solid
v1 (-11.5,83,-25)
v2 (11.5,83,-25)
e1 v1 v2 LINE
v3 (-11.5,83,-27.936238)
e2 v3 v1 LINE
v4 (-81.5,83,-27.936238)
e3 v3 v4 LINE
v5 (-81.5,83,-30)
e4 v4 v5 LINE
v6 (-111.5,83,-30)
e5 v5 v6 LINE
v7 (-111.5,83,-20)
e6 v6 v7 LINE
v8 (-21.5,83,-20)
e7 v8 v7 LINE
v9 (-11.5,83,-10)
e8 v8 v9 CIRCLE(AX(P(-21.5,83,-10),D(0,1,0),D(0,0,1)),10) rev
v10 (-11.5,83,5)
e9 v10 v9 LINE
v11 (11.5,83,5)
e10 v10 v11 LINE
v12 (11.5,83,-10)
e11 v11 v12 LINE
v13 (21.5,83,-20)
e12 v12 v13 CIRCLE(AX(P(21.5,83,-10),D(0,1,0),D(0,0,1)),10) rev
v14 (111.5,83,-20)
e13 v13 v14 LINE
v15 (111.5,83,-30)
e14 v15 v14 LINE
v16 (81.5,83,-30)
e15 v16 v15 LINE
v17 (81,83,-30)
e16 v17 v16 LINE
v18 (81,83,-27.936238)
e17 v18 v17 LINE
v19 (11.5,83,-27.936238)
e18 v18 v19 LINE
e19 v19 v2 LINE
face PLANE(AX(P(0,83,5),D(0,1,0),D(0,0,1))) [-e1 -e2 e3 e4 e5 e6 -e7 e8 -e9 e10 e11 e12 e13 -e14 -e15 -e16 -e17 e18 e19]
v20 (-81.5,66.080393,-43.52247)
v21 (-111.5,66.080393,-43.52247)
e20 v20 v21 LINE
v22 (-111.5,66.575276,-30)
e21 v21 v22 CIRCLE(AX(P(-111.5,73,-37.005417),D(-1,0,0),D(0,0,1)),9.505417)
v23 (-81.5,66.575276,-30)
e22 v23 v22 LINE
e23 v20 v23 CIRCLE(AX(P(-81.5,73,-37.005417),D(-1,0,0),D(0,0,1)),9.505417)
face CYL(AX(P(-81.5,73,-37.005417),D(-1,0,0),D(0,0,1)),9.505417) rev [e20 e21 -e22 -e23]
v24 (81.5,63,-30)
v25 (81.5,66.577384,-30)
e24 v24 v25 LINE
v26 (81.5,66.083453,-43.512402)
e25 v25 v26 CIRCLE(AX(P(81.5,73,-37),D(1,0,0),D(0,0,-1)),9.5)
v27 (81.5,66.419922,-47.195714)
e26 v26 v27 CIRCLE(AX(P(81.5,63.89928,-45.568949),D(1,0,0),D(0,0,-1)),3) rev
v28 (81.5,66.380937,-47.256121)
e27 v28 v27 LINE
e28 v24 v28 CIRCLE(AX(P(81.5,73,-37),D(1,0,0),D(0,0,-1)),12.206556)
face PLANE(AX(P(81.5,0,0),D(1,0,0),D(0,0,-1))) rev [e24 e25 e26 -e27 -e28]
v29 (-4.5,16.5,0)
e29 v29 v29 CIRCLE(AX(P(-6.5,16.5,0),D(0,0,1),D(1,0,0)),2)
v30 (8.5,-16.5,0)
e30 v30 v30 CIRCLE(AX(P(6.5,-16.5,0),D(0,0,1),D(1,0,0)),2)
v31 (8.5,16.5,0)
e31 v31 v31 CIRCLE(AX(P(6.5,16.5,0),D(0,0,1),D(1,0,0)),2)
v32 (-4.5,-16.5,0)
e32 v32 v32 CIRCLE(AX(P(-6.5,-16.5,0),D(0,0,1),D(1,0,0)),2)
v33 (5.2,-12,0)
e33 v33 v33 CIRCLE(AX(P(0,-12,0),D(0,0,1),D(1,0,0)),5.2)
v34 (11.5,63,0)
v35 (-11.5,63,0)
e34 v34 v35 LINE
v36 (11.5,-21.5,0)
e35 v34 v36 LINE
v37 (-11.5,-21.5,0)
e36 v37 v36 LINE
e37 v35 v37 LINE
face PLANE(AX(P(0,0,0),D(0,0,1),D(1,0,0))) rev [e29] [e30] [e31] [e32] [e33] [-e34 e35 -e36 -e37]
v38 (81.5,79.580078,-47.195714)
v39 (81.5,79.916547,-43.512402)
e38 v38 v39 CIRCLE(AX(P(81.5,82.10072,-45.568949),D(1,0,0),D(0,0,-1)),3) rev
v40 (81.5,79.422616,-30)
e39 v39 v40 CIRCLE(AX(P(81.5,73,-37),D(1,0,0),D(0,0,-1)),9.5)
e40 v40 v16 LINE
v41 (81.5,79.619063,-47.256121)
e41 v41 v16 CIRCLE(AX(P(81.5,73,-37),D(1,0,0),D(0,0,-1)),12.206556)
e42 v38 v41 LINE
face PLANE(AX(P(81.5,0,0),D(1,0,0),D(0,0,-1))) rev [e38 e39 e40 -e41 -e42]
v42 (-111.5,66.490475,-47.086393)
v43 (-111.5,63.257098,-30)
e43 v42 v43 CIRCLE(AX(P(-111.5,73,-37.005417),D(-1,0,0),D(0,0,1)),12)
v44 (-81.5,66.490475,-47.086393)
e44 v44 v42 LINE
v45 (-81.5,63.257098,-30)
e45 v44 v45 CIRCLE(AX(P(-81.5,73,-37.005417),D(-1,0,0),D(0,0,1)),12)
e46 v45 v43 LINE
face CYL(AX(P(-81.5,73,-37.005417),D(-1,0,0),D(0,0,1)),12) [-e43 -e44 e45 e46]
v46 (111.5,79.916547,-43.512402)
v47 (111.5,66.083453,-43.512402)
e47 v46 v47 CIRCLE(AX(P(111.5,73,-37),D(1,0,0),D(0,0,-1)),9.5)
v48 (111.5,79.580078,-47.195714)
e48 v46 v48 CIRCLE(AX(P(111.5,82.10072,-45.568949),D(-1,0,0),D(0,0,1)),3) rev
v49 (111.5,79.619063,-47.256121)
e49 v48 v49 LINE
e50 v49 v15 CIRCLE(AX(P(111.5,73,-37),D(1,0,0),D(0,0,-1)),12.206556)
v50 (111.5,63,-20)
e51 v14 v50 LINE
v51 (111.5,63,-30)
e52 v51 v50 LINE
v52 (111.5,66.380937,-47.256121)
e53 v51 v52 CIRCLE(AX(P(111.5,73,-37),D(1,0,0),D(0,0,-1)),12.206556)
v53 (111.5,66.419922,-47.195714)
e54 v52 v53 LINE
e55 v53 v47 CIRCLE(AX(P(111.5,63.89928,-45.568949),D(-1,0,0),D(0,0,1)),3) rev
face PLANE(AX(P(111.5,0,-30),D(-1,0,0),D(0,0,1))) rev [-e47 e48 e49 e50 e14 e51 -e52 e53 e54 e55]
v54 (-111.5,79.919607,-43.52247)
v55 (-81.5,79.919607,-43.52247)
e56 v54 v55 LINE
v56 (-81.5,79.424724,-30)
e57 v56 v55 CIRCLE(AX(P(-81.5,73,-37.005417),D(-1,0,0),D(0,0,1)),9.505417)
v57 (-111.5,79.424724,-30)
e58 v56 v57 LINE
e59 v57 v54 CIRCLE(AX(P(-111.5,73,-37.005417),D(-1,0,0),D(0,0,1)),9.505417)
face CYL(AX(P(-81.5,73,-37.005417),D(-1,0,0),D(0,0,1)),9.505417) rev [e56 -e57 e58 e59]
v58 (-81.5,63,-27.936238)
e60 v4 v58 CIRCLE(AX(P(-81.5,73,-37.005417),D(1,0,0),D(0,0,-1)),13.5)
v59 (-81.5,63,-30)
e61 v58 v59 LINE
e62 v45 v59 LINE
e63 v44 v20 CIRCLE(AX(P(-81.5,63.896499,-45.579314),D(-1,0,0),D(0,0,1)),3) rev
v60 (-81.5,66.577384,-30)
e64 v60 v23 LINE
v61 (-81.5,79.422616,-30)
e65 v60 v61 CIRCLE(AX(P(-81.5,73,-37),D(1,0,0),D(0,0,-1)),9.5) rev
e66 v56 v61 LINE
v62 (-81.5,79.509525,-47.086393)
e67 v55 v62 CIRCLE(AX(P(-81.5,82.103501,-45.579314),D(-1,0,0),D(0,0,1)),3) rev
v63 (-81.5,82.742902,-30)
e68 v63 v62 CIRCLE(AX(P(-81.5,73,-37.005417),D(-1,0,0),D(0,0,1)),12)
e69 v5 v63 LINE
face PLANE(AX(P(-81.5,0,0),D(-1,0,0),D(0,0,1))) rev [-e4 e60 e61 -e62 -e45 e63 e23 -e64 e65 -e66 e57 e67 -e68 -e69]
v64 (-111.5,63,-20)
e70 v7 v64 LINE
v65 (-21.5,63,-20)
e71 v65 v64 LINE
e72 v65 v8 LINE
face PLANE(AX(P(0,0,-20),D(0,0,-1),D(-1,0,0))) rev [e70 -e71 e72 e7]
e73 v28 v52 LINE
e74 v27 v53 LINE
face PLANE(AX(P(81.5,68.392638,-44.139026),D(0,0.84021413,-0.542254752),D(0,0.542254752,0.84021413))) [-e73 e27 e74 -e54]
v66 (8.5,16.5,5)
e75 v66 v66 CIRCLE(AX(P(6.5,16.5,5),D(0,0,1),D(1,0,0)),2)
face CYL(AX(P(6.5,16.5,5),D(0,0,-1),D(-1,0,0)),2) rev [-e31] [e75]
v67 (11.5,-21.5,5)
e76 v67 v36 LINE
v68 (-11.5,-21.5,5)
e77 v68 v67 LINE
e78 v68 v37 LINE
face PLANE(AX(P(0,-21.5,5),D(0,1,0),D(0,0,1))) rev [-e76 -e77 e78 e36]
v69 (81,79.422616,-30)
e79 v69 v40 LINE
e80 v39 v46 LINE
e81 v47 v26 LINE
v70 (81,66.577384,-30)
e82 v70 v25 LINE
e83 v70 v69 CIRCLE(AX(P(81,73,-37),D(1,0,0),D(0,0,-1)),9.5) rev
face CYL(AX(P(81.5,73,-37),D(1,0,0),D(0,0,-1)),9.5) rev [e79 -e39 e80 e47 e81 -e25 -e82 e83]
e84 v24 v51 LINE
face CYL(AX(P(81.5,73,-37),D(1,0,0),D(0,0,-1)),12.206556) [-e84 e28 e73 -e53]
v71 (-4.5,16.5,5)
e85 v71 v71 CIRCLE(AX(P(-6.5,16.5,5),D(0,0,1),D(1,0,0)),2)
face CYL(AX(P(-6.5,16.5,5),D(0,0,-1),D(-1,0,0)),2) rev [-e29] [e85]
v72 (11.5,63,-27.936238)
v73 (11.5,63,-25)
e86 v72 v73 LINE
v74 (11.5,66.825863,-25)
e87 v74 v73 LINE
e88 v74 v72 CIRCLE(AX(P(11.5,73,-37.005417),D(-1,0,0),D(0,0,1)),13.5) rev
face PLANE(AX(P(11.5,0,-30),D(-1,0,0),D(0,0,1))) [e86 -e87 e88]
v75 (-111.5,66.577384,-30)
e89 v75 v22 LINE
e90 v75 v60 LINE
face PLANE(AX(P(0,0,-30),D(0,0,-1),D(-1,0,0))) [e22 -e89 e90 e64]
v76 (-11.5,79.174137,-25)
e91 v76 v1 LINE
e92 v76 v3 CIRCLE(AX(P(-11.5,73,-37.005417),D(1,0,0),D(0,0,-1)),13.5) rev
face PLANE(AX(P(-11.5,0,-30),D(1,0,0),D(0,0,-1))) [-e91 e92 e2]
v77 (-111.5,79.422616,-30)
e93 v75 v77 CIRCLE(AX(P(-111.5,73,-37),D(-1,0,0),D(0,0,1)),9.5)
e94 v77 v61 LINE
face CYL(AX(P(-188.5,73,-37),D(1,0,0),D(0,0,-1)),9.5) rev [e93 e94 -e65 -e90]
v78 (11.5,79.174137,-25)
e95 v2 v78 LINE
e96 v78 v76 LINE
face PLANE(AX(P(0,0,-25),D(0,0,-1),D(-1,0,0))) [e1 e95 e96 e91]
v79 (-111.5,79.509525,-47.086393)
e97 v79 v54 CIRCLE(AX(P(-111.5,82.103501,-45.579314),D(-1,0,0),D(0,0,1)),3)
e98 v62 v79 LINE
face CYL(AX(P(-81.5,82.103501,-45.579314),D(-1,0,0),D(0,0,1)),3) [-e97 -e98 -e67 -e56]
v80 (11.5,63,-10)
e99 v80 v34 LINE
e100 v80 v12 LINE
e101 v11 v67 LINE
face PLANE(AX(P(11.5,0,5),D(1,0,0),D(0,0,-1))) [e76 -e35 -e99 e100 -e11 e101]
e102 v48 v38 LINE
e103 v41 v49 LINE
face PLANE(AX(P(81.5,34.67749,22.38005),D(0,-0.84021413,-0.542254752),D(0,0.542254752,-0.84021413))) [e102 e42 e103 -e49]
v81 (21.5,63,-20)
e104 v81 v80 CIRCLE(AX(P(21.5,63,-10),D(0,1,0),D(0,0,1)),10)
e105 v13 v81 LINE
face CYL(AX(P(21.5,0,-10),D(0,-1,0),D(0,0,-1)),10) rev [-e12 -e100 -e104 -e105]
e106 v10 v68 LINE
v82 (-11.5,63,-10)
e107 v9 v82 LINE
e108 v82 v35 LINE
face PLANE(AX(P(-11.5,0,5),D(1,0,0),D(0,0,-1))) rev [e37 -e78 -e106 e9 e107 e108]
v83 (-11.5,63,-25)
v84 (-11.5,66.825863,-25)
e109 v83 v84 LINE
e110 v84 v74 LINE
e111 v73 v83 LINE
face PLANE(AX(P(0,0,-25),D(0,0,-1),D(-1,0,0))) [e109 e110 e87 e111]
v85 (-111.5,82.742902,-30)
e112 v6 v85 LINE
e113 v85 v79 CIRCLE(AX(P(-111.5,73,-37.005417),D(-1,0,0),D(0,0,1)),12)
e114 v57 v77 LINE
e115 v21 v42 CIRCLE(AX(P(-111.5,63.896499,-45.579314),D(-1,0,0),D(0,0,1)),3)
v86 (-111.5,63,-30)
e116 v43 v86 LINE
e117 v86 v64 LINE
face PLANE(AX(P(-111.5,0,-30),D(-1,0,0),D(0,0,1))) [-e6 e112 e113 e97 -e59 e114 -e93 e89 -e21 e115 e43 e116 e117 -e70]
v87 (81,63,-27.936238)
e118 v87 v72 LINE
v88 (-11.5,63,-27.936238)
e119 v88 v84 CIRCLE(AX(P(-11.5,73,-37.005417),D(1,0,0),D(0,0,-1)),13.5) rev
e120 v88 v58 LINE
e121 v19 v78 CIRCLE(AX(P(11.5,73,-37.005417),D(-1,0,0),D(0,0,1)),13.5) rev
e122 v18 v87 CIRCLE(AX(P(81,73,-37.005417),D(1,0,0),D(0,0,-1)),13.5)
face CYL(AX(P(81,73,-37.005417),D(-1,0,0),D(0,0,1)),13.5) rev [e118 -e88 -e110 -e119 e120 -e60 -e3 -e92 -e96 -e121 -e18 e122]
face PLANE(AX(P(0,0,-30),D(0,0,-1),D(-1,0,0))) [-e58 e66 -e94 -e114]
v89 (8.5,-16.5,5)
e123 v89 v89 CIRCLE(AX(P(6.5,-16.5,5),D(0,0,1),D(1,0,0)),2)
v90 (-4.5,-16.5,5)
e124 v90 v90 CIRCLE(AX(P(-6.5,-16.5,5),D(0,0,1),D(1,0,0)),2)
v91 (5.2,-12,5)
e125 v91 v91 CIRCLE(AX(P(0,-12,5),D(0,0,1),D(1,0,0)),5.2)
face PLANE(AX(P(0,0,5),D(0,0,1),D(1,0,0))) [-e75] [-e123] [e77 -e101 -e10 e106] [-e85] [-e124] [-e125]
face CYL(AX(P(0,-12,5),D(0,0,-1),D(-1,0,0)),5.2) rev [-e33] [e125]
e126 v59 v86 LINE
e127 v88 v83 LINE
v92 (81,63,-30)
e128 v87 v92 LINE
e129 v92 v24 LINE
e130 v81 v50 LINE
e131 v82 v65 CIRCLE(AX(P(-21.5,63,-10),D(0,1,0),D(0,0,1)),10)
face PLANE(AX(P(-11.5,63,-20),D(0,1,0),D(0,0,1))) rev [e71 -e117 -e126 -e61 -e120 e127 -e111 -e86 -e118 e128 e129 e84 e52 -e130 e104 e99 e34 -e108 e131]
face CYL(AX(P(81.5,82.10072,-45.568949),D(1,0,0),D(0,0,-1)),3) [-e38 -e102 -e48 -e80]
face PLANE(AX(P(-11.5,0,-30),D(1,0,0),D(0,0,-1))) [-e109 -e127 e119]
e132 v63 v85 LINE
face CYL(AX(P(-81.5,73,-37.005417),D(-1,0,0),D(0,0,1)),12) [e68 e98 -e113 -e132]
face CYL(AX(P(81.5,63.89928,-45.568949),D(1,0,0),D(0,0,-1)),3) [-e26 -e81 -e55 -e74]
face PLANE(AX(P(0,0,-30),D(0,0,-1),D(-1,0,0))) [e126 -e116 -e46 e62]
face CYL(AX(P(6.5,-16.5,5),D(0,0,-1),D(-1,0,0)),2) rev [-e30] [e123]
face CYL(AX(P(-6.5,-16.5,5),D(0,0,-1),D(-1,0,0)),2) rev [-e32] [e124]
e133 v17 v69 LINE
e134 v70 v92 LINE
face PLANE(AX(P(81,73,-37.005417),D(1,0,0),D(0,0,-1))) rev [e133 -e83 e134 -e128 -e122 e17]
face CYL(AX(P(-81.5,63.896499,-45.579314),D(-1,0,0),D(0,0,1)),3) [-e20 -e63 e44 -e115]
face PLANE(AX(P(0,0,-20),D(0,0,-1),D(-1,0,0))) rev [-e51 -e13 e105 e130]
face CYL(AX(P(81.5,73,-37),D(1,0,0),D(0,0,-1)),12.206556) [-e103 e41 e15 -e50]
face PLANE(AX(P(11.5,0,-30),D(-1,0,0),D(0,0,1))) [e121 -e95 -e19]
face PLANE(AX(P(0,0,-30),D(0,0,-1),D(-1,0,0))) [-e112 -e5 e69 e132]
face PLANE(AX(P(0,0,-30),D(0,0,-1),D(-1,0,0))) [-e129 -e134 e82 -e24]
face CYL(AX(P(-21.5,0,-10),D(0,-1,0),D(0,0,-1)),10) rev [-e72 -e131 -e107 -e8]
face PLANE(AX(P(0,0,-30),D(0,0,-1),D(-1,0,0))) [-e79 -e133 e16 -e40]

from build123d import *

# Parameters (mm, degrees)
SKETCH1_W           = 23
SKETCH1_H           = 104.5
SKETCH1_R           = 2
SKETCH1_R_2         = 5.2
BOSS_EXTRUDE1_DEPTH = 5
SKETCH2_W           = 23
SKETCH2_H           = 20
BOSS_EXTRUDE2_DEPTH = 20
SKETCH3_W           = 23
SKETCH3_H           = 20
BOSS_EXTRUDE3_DEPTH = 5
SKETCH3_3_W         = 100
SKETCH3_3_H         = 20
BOSS_EXTRUDE4_DEPTH = 10
BOSS_EXTRUDE5_DEPTH = 30
BOSS_EXTRUDE6_DEPTH = 30
FILLET1_R           = 10
CUT_EXTRUDE1_DEPTH  = 300
SKETCH6_R           = 13.5
CUT_EXTRUDE2_DEPTH  = 162.5
FILLET5_R           = 3


with BuildPart() as part:
    # Sketch1 → Boss-Extrude1 (new body)
    with BuildSketch(Plane.XY):
        with Locations((0, 30.75)):
            Rectangle(SKETCH1_W, SKETCH1_H)
        with Locations((6.5, 16.5)):
            Circle(SKETCH1_R, mode=Mode.SUBTRACT)
        with Locations((6.5, -16.5)):
            Circle(SKETCH1_R, mode=Mode.SUBTRACT)
        with Locations((0, -12)):
            Circle(SKETCH1_R_2, mode=Mode.SUBTRACT)
        with Locations((-6.5, -16.5)):
            Circle(SKETCH1_R, mode=Mode.SUBTRACT)
        with Locations((-6.5, 16.5)):
            Circle(SKETCH1_R, mode=Mode.SUBTRACT)
    extrude(amount=BOSS_EXTRUDE1_DEPTH)

    # Sketch2 → Boss-Extrude2 (add)
    with BuildSketch(Plane(origin=(0, 0, 0), x_dir=(-1, 0, 0), z_dir=(0, 0, -1))):
        with Locations((0, 73)):
            Rectangle(SKETCH2_W, SKETCH2_H)
    extrude(amount=BOSS_EXTRUDE2_DEPTH)

    # Sketch3 → Boss-Extrude3 (add)
    with BuildSketch(Plane(origin=(0, 0, -20), x_dir=(-1, 0, 0), z_dir=(0, 0, -1))):
        with Locations((0, 73)):
            Rectangle(SKETCH3_W, SKETCH3_H)
    extrude(amount=BOSS_EXTRUDE3_DEPTH)

    # Sketch3<3> → Boss-Extrude4 (add)
    with BuildSketch(Plane(origin=(0, 0, -20), x_dir=(-1, 0, 0), z_dir=(0, 0, -1))):
        with Locations((-61.5, 73)):
            Rectangle(SKETCH3_3_W, SKETCH3_3_H)
        with Locations((61.5, 73)):
            Rectangle(SKETCH3_3_W, SKETCH3_3_H)
    extrude(amount=BOSS_EXTRUDE4_DEPTH)

    # Sketch4 → Boss-Extrude5 (add)
    with BuildSketch(Plane(origin=(111.5, 0, 0), x_dir=(0, 0, -1), z_dir=(1, 0, 0))):
        with BuildLine():
            Line((30, 83), (30, 79.422616289))
            ThreePointArc((30, 79.422616289), (37.803170415, 82.465987391), (44.982034231, 78.151420148))
            Line((44.982034231, 78.151420148), (47.256120501, 79.619062793))
            ThreePointArc((47.256120501, 79.619062793), (39.346969169, 84.978803601), (30, 83))
        make_face()
        with BuildLine():
            ThreePointArc((44.982034231, 67.848579852), (37.803170415, 63.534012609), (30, 66.577383711))
            Line((30, 66.577383711), (30, 63))
            ThreePointArc((30, 63), (39.346969169, 61.021196399), (47.256120501, 66.380937207))
            Line((47.256120501, 66.380937207), (44.982034231, 67.848579852))
        make_face()
    extrude(amount=-BOSS_EXTRUDE5_DEPTH)

    # Sketch5 → Boss-Extrude6 (add)
    with BuildSketch(Plane.ZY.offset(111.5)):
        with BuildLine():
            ThreePointArc((-44.99074033, 78.15631214), (-37.806835348, 82.471571982), (-30, 79.42472441))
            Line((-30, 79.42472441), (-30, 82.742901835))
            ThreePointArc((-30, 82.742901835), (-39.236660525, 84.790740062), (-47.086393259, 79.50952476))
            Line((-47.086393259, 79.50952476), (-44.99074033, 78.15631214))
        make_face()
        with BuildLine():
            Line((-30, 63.257098165), (-30, 66.57527559))
            ThreePointArc((-30, 66.57527559), (-37.806835348, 63.528428018), (-44.99074033, 67.84368786))
            Line((-44.99074033, 67.84368786), (-47.086393259, 66.49047524))
            ThreePointArc((-47.086393259, 66.49047524), (-39.236660525, 61.209259938), (-30, 63.257098165))
        make_face()
    extrude(amount=-BOSS_EXTRUDE6_DEPTH)

    # Fillet1
    fillet1_edges = [part.edges().sort_by_distance(p)[0] for p in [
        (11.5, 73, -20),
        (-11.5, 73, -20),
    ]]
    fillet(fillet1_edges, radius=FILLET1_R)

    # Sketch4<3> → Cut-Extrude1 (cut)
    with BuildSketch(Plane(origin=(111.5, 0, 0), x_dir=(0, 0, -1), z_dir=(1, 0, 0))):
        with BuildLine():
            Line((30, 66.577383711), (30, 73))
            Line((30, 73), (27.5, 73))
            ThreePointArc((27.5, 73), (28.147034395, 69.553987812), (30, 66.577383711))
        make_face()
        with BuildLine():
            Line((27.5, 73), (30, 73))
            Line((30, 73), (30, 79.422616289))
            ThreePointArc((30, 79.422616289), (28.147034395, 76.446012188), (27.5, 73))
        make_face()
    extrude(amount=-CUT_EXTRUDE1_DEPTH, mode=Mode.SUBTRACT)

    # Sketch6 → Cut-Extrude2 (cut)
    with BuildSketch(Plane(origin=(-81.5, 0, 0), x_dir=(0, 0, -1), z_dir=(1, 0, 0))):
        with Locations((37.005416749, 73)):
            Circle(SKETCH6_R)
    extrude(amount=CUT_EXTRUDE2_DEPTH, mode=Mode.SUBTRACT)

    # Fillet5
    # the kernel refuses this fillet: 3 mm, written as the material it takes off along each edge
    with BuildSketch(Plane(origin=(118.086652749, 67.848579852, -44.982034231), x_dir=(0, -0.768500975054365, 0.6398486159557513), z_dir=(-1, 0, 0))) as fillet5_piece_1:
        with BuildLine():
            CenterArc((2.659503922, -2.977998992), FILLET5_R, 96.943270181, 76.113459637)
            Line((-0.318495069, -2.615339366), (-0.378055049, -2.608086174))
            Line((-0.378055049, -2.608086174), (-0.05955998, 0.007253193))
            Line((-0.05955998, 0.007253193), (0.007253193, 0.05955998))
            ThreePointArc((0.007253193, 0.05955998), (1.148422148, -0.009669859), (2.289591104, 0.05955998))
            Line((2.289591104, 0.05955998), (2.296844297, 0))
        make_face()
    extrude(amount=43.173305498, mode=Mode.SUBTRACT)
    with BuildSketch(Plane(origin=(-117.736458127, 67.84368786, -44.99074033), x_dir=(0, -0.5424603966463132, -0.8400813758620795), z_dir=(1, 0, 0))) as fillet5_piece_2:
        with BuildLine():
            CenterArc((2.635643587, -2.996681829), FILLET5_R, 92.695047673, 73.440207037)
            Line((-0.276948751, -2.277789714), (-0.335200598, -2.263411872))
            ThreePointArc((-0.335200598, -2.263411872), (-0.129052561, -1.140040424), (-0.06, 0))
            Line((-0.06, 0), (0, 0.06))
            ThreePointArc((0, 0.06), (1.247291625, 0.06), (2.491762044, 0.059933637))
            Line((2.491762044, 0.059933637), (2.494583251, 0))
        make_face()
    extrude(amount=42.472916254, mode=Mode.SUBTRACT)
    with BuildSketch(Plane(origin=(-117.736458127, 78.15631214, -44.99074033), x_dir=(0, 0.7684660550632233, 0.6398905548729151), z_dir=(1, 0, 0))) as fillet5_piece_3:
        with BuildLine():
            CenterArc((2.656657786, -2.978067915), FILLET5_R, 96.932372645, 73.440207037)
            Line((-0.301090552, -2.476346114), (-0.360245519, -2.466311678))
            ThreePointArc((-0.360245519, -2.466311678), (-0.210106634, -1.230931193), (-0.059561358, 0.007241864))
            Line((-0.059561358, 0.007241864), (0.007241864, 0.059561358))
            ThreePointArc((0.007241864, 0.059561358), (1.147282288, -0.009491202), (2.287322712, 0.059561358))
            Line((2.287322712, 0.059561358), (2.294564576, 0))
        make_face()
    extrude(amount=42.472916254, mode=Mode.SUBTRACT)
    with BuildSketch(Plane(origin=(118.086652749, 78.151420148, -44.982034231), x_dir=(0, 0.5422547524206679, -0.8402141295391314), z_dir=(-1, 0, 0))) as fillet5_piece_4:
        with BuildLine():
            CenterArc((2.6346611, -3), FILLET5_R, 90, 76.113459637)
            Line((-0.277657564, -2.28), (-0.335903938, -2.2656))
            ThreePointArc((-0.335903938, -2.2656), (-0.129229839, -1.141168956), (-0.06, 0))
            Line((-0.06, 0), (0, 0.06))
            Line((0, 0.06), (2.6346611, 0.06))
            Line((2.6346611, 0.06), (2.6346611, 0))
        make_face()
    extrude(amount=43.173305498, mode=Mode.SUBTRACT)


solid = part.part
